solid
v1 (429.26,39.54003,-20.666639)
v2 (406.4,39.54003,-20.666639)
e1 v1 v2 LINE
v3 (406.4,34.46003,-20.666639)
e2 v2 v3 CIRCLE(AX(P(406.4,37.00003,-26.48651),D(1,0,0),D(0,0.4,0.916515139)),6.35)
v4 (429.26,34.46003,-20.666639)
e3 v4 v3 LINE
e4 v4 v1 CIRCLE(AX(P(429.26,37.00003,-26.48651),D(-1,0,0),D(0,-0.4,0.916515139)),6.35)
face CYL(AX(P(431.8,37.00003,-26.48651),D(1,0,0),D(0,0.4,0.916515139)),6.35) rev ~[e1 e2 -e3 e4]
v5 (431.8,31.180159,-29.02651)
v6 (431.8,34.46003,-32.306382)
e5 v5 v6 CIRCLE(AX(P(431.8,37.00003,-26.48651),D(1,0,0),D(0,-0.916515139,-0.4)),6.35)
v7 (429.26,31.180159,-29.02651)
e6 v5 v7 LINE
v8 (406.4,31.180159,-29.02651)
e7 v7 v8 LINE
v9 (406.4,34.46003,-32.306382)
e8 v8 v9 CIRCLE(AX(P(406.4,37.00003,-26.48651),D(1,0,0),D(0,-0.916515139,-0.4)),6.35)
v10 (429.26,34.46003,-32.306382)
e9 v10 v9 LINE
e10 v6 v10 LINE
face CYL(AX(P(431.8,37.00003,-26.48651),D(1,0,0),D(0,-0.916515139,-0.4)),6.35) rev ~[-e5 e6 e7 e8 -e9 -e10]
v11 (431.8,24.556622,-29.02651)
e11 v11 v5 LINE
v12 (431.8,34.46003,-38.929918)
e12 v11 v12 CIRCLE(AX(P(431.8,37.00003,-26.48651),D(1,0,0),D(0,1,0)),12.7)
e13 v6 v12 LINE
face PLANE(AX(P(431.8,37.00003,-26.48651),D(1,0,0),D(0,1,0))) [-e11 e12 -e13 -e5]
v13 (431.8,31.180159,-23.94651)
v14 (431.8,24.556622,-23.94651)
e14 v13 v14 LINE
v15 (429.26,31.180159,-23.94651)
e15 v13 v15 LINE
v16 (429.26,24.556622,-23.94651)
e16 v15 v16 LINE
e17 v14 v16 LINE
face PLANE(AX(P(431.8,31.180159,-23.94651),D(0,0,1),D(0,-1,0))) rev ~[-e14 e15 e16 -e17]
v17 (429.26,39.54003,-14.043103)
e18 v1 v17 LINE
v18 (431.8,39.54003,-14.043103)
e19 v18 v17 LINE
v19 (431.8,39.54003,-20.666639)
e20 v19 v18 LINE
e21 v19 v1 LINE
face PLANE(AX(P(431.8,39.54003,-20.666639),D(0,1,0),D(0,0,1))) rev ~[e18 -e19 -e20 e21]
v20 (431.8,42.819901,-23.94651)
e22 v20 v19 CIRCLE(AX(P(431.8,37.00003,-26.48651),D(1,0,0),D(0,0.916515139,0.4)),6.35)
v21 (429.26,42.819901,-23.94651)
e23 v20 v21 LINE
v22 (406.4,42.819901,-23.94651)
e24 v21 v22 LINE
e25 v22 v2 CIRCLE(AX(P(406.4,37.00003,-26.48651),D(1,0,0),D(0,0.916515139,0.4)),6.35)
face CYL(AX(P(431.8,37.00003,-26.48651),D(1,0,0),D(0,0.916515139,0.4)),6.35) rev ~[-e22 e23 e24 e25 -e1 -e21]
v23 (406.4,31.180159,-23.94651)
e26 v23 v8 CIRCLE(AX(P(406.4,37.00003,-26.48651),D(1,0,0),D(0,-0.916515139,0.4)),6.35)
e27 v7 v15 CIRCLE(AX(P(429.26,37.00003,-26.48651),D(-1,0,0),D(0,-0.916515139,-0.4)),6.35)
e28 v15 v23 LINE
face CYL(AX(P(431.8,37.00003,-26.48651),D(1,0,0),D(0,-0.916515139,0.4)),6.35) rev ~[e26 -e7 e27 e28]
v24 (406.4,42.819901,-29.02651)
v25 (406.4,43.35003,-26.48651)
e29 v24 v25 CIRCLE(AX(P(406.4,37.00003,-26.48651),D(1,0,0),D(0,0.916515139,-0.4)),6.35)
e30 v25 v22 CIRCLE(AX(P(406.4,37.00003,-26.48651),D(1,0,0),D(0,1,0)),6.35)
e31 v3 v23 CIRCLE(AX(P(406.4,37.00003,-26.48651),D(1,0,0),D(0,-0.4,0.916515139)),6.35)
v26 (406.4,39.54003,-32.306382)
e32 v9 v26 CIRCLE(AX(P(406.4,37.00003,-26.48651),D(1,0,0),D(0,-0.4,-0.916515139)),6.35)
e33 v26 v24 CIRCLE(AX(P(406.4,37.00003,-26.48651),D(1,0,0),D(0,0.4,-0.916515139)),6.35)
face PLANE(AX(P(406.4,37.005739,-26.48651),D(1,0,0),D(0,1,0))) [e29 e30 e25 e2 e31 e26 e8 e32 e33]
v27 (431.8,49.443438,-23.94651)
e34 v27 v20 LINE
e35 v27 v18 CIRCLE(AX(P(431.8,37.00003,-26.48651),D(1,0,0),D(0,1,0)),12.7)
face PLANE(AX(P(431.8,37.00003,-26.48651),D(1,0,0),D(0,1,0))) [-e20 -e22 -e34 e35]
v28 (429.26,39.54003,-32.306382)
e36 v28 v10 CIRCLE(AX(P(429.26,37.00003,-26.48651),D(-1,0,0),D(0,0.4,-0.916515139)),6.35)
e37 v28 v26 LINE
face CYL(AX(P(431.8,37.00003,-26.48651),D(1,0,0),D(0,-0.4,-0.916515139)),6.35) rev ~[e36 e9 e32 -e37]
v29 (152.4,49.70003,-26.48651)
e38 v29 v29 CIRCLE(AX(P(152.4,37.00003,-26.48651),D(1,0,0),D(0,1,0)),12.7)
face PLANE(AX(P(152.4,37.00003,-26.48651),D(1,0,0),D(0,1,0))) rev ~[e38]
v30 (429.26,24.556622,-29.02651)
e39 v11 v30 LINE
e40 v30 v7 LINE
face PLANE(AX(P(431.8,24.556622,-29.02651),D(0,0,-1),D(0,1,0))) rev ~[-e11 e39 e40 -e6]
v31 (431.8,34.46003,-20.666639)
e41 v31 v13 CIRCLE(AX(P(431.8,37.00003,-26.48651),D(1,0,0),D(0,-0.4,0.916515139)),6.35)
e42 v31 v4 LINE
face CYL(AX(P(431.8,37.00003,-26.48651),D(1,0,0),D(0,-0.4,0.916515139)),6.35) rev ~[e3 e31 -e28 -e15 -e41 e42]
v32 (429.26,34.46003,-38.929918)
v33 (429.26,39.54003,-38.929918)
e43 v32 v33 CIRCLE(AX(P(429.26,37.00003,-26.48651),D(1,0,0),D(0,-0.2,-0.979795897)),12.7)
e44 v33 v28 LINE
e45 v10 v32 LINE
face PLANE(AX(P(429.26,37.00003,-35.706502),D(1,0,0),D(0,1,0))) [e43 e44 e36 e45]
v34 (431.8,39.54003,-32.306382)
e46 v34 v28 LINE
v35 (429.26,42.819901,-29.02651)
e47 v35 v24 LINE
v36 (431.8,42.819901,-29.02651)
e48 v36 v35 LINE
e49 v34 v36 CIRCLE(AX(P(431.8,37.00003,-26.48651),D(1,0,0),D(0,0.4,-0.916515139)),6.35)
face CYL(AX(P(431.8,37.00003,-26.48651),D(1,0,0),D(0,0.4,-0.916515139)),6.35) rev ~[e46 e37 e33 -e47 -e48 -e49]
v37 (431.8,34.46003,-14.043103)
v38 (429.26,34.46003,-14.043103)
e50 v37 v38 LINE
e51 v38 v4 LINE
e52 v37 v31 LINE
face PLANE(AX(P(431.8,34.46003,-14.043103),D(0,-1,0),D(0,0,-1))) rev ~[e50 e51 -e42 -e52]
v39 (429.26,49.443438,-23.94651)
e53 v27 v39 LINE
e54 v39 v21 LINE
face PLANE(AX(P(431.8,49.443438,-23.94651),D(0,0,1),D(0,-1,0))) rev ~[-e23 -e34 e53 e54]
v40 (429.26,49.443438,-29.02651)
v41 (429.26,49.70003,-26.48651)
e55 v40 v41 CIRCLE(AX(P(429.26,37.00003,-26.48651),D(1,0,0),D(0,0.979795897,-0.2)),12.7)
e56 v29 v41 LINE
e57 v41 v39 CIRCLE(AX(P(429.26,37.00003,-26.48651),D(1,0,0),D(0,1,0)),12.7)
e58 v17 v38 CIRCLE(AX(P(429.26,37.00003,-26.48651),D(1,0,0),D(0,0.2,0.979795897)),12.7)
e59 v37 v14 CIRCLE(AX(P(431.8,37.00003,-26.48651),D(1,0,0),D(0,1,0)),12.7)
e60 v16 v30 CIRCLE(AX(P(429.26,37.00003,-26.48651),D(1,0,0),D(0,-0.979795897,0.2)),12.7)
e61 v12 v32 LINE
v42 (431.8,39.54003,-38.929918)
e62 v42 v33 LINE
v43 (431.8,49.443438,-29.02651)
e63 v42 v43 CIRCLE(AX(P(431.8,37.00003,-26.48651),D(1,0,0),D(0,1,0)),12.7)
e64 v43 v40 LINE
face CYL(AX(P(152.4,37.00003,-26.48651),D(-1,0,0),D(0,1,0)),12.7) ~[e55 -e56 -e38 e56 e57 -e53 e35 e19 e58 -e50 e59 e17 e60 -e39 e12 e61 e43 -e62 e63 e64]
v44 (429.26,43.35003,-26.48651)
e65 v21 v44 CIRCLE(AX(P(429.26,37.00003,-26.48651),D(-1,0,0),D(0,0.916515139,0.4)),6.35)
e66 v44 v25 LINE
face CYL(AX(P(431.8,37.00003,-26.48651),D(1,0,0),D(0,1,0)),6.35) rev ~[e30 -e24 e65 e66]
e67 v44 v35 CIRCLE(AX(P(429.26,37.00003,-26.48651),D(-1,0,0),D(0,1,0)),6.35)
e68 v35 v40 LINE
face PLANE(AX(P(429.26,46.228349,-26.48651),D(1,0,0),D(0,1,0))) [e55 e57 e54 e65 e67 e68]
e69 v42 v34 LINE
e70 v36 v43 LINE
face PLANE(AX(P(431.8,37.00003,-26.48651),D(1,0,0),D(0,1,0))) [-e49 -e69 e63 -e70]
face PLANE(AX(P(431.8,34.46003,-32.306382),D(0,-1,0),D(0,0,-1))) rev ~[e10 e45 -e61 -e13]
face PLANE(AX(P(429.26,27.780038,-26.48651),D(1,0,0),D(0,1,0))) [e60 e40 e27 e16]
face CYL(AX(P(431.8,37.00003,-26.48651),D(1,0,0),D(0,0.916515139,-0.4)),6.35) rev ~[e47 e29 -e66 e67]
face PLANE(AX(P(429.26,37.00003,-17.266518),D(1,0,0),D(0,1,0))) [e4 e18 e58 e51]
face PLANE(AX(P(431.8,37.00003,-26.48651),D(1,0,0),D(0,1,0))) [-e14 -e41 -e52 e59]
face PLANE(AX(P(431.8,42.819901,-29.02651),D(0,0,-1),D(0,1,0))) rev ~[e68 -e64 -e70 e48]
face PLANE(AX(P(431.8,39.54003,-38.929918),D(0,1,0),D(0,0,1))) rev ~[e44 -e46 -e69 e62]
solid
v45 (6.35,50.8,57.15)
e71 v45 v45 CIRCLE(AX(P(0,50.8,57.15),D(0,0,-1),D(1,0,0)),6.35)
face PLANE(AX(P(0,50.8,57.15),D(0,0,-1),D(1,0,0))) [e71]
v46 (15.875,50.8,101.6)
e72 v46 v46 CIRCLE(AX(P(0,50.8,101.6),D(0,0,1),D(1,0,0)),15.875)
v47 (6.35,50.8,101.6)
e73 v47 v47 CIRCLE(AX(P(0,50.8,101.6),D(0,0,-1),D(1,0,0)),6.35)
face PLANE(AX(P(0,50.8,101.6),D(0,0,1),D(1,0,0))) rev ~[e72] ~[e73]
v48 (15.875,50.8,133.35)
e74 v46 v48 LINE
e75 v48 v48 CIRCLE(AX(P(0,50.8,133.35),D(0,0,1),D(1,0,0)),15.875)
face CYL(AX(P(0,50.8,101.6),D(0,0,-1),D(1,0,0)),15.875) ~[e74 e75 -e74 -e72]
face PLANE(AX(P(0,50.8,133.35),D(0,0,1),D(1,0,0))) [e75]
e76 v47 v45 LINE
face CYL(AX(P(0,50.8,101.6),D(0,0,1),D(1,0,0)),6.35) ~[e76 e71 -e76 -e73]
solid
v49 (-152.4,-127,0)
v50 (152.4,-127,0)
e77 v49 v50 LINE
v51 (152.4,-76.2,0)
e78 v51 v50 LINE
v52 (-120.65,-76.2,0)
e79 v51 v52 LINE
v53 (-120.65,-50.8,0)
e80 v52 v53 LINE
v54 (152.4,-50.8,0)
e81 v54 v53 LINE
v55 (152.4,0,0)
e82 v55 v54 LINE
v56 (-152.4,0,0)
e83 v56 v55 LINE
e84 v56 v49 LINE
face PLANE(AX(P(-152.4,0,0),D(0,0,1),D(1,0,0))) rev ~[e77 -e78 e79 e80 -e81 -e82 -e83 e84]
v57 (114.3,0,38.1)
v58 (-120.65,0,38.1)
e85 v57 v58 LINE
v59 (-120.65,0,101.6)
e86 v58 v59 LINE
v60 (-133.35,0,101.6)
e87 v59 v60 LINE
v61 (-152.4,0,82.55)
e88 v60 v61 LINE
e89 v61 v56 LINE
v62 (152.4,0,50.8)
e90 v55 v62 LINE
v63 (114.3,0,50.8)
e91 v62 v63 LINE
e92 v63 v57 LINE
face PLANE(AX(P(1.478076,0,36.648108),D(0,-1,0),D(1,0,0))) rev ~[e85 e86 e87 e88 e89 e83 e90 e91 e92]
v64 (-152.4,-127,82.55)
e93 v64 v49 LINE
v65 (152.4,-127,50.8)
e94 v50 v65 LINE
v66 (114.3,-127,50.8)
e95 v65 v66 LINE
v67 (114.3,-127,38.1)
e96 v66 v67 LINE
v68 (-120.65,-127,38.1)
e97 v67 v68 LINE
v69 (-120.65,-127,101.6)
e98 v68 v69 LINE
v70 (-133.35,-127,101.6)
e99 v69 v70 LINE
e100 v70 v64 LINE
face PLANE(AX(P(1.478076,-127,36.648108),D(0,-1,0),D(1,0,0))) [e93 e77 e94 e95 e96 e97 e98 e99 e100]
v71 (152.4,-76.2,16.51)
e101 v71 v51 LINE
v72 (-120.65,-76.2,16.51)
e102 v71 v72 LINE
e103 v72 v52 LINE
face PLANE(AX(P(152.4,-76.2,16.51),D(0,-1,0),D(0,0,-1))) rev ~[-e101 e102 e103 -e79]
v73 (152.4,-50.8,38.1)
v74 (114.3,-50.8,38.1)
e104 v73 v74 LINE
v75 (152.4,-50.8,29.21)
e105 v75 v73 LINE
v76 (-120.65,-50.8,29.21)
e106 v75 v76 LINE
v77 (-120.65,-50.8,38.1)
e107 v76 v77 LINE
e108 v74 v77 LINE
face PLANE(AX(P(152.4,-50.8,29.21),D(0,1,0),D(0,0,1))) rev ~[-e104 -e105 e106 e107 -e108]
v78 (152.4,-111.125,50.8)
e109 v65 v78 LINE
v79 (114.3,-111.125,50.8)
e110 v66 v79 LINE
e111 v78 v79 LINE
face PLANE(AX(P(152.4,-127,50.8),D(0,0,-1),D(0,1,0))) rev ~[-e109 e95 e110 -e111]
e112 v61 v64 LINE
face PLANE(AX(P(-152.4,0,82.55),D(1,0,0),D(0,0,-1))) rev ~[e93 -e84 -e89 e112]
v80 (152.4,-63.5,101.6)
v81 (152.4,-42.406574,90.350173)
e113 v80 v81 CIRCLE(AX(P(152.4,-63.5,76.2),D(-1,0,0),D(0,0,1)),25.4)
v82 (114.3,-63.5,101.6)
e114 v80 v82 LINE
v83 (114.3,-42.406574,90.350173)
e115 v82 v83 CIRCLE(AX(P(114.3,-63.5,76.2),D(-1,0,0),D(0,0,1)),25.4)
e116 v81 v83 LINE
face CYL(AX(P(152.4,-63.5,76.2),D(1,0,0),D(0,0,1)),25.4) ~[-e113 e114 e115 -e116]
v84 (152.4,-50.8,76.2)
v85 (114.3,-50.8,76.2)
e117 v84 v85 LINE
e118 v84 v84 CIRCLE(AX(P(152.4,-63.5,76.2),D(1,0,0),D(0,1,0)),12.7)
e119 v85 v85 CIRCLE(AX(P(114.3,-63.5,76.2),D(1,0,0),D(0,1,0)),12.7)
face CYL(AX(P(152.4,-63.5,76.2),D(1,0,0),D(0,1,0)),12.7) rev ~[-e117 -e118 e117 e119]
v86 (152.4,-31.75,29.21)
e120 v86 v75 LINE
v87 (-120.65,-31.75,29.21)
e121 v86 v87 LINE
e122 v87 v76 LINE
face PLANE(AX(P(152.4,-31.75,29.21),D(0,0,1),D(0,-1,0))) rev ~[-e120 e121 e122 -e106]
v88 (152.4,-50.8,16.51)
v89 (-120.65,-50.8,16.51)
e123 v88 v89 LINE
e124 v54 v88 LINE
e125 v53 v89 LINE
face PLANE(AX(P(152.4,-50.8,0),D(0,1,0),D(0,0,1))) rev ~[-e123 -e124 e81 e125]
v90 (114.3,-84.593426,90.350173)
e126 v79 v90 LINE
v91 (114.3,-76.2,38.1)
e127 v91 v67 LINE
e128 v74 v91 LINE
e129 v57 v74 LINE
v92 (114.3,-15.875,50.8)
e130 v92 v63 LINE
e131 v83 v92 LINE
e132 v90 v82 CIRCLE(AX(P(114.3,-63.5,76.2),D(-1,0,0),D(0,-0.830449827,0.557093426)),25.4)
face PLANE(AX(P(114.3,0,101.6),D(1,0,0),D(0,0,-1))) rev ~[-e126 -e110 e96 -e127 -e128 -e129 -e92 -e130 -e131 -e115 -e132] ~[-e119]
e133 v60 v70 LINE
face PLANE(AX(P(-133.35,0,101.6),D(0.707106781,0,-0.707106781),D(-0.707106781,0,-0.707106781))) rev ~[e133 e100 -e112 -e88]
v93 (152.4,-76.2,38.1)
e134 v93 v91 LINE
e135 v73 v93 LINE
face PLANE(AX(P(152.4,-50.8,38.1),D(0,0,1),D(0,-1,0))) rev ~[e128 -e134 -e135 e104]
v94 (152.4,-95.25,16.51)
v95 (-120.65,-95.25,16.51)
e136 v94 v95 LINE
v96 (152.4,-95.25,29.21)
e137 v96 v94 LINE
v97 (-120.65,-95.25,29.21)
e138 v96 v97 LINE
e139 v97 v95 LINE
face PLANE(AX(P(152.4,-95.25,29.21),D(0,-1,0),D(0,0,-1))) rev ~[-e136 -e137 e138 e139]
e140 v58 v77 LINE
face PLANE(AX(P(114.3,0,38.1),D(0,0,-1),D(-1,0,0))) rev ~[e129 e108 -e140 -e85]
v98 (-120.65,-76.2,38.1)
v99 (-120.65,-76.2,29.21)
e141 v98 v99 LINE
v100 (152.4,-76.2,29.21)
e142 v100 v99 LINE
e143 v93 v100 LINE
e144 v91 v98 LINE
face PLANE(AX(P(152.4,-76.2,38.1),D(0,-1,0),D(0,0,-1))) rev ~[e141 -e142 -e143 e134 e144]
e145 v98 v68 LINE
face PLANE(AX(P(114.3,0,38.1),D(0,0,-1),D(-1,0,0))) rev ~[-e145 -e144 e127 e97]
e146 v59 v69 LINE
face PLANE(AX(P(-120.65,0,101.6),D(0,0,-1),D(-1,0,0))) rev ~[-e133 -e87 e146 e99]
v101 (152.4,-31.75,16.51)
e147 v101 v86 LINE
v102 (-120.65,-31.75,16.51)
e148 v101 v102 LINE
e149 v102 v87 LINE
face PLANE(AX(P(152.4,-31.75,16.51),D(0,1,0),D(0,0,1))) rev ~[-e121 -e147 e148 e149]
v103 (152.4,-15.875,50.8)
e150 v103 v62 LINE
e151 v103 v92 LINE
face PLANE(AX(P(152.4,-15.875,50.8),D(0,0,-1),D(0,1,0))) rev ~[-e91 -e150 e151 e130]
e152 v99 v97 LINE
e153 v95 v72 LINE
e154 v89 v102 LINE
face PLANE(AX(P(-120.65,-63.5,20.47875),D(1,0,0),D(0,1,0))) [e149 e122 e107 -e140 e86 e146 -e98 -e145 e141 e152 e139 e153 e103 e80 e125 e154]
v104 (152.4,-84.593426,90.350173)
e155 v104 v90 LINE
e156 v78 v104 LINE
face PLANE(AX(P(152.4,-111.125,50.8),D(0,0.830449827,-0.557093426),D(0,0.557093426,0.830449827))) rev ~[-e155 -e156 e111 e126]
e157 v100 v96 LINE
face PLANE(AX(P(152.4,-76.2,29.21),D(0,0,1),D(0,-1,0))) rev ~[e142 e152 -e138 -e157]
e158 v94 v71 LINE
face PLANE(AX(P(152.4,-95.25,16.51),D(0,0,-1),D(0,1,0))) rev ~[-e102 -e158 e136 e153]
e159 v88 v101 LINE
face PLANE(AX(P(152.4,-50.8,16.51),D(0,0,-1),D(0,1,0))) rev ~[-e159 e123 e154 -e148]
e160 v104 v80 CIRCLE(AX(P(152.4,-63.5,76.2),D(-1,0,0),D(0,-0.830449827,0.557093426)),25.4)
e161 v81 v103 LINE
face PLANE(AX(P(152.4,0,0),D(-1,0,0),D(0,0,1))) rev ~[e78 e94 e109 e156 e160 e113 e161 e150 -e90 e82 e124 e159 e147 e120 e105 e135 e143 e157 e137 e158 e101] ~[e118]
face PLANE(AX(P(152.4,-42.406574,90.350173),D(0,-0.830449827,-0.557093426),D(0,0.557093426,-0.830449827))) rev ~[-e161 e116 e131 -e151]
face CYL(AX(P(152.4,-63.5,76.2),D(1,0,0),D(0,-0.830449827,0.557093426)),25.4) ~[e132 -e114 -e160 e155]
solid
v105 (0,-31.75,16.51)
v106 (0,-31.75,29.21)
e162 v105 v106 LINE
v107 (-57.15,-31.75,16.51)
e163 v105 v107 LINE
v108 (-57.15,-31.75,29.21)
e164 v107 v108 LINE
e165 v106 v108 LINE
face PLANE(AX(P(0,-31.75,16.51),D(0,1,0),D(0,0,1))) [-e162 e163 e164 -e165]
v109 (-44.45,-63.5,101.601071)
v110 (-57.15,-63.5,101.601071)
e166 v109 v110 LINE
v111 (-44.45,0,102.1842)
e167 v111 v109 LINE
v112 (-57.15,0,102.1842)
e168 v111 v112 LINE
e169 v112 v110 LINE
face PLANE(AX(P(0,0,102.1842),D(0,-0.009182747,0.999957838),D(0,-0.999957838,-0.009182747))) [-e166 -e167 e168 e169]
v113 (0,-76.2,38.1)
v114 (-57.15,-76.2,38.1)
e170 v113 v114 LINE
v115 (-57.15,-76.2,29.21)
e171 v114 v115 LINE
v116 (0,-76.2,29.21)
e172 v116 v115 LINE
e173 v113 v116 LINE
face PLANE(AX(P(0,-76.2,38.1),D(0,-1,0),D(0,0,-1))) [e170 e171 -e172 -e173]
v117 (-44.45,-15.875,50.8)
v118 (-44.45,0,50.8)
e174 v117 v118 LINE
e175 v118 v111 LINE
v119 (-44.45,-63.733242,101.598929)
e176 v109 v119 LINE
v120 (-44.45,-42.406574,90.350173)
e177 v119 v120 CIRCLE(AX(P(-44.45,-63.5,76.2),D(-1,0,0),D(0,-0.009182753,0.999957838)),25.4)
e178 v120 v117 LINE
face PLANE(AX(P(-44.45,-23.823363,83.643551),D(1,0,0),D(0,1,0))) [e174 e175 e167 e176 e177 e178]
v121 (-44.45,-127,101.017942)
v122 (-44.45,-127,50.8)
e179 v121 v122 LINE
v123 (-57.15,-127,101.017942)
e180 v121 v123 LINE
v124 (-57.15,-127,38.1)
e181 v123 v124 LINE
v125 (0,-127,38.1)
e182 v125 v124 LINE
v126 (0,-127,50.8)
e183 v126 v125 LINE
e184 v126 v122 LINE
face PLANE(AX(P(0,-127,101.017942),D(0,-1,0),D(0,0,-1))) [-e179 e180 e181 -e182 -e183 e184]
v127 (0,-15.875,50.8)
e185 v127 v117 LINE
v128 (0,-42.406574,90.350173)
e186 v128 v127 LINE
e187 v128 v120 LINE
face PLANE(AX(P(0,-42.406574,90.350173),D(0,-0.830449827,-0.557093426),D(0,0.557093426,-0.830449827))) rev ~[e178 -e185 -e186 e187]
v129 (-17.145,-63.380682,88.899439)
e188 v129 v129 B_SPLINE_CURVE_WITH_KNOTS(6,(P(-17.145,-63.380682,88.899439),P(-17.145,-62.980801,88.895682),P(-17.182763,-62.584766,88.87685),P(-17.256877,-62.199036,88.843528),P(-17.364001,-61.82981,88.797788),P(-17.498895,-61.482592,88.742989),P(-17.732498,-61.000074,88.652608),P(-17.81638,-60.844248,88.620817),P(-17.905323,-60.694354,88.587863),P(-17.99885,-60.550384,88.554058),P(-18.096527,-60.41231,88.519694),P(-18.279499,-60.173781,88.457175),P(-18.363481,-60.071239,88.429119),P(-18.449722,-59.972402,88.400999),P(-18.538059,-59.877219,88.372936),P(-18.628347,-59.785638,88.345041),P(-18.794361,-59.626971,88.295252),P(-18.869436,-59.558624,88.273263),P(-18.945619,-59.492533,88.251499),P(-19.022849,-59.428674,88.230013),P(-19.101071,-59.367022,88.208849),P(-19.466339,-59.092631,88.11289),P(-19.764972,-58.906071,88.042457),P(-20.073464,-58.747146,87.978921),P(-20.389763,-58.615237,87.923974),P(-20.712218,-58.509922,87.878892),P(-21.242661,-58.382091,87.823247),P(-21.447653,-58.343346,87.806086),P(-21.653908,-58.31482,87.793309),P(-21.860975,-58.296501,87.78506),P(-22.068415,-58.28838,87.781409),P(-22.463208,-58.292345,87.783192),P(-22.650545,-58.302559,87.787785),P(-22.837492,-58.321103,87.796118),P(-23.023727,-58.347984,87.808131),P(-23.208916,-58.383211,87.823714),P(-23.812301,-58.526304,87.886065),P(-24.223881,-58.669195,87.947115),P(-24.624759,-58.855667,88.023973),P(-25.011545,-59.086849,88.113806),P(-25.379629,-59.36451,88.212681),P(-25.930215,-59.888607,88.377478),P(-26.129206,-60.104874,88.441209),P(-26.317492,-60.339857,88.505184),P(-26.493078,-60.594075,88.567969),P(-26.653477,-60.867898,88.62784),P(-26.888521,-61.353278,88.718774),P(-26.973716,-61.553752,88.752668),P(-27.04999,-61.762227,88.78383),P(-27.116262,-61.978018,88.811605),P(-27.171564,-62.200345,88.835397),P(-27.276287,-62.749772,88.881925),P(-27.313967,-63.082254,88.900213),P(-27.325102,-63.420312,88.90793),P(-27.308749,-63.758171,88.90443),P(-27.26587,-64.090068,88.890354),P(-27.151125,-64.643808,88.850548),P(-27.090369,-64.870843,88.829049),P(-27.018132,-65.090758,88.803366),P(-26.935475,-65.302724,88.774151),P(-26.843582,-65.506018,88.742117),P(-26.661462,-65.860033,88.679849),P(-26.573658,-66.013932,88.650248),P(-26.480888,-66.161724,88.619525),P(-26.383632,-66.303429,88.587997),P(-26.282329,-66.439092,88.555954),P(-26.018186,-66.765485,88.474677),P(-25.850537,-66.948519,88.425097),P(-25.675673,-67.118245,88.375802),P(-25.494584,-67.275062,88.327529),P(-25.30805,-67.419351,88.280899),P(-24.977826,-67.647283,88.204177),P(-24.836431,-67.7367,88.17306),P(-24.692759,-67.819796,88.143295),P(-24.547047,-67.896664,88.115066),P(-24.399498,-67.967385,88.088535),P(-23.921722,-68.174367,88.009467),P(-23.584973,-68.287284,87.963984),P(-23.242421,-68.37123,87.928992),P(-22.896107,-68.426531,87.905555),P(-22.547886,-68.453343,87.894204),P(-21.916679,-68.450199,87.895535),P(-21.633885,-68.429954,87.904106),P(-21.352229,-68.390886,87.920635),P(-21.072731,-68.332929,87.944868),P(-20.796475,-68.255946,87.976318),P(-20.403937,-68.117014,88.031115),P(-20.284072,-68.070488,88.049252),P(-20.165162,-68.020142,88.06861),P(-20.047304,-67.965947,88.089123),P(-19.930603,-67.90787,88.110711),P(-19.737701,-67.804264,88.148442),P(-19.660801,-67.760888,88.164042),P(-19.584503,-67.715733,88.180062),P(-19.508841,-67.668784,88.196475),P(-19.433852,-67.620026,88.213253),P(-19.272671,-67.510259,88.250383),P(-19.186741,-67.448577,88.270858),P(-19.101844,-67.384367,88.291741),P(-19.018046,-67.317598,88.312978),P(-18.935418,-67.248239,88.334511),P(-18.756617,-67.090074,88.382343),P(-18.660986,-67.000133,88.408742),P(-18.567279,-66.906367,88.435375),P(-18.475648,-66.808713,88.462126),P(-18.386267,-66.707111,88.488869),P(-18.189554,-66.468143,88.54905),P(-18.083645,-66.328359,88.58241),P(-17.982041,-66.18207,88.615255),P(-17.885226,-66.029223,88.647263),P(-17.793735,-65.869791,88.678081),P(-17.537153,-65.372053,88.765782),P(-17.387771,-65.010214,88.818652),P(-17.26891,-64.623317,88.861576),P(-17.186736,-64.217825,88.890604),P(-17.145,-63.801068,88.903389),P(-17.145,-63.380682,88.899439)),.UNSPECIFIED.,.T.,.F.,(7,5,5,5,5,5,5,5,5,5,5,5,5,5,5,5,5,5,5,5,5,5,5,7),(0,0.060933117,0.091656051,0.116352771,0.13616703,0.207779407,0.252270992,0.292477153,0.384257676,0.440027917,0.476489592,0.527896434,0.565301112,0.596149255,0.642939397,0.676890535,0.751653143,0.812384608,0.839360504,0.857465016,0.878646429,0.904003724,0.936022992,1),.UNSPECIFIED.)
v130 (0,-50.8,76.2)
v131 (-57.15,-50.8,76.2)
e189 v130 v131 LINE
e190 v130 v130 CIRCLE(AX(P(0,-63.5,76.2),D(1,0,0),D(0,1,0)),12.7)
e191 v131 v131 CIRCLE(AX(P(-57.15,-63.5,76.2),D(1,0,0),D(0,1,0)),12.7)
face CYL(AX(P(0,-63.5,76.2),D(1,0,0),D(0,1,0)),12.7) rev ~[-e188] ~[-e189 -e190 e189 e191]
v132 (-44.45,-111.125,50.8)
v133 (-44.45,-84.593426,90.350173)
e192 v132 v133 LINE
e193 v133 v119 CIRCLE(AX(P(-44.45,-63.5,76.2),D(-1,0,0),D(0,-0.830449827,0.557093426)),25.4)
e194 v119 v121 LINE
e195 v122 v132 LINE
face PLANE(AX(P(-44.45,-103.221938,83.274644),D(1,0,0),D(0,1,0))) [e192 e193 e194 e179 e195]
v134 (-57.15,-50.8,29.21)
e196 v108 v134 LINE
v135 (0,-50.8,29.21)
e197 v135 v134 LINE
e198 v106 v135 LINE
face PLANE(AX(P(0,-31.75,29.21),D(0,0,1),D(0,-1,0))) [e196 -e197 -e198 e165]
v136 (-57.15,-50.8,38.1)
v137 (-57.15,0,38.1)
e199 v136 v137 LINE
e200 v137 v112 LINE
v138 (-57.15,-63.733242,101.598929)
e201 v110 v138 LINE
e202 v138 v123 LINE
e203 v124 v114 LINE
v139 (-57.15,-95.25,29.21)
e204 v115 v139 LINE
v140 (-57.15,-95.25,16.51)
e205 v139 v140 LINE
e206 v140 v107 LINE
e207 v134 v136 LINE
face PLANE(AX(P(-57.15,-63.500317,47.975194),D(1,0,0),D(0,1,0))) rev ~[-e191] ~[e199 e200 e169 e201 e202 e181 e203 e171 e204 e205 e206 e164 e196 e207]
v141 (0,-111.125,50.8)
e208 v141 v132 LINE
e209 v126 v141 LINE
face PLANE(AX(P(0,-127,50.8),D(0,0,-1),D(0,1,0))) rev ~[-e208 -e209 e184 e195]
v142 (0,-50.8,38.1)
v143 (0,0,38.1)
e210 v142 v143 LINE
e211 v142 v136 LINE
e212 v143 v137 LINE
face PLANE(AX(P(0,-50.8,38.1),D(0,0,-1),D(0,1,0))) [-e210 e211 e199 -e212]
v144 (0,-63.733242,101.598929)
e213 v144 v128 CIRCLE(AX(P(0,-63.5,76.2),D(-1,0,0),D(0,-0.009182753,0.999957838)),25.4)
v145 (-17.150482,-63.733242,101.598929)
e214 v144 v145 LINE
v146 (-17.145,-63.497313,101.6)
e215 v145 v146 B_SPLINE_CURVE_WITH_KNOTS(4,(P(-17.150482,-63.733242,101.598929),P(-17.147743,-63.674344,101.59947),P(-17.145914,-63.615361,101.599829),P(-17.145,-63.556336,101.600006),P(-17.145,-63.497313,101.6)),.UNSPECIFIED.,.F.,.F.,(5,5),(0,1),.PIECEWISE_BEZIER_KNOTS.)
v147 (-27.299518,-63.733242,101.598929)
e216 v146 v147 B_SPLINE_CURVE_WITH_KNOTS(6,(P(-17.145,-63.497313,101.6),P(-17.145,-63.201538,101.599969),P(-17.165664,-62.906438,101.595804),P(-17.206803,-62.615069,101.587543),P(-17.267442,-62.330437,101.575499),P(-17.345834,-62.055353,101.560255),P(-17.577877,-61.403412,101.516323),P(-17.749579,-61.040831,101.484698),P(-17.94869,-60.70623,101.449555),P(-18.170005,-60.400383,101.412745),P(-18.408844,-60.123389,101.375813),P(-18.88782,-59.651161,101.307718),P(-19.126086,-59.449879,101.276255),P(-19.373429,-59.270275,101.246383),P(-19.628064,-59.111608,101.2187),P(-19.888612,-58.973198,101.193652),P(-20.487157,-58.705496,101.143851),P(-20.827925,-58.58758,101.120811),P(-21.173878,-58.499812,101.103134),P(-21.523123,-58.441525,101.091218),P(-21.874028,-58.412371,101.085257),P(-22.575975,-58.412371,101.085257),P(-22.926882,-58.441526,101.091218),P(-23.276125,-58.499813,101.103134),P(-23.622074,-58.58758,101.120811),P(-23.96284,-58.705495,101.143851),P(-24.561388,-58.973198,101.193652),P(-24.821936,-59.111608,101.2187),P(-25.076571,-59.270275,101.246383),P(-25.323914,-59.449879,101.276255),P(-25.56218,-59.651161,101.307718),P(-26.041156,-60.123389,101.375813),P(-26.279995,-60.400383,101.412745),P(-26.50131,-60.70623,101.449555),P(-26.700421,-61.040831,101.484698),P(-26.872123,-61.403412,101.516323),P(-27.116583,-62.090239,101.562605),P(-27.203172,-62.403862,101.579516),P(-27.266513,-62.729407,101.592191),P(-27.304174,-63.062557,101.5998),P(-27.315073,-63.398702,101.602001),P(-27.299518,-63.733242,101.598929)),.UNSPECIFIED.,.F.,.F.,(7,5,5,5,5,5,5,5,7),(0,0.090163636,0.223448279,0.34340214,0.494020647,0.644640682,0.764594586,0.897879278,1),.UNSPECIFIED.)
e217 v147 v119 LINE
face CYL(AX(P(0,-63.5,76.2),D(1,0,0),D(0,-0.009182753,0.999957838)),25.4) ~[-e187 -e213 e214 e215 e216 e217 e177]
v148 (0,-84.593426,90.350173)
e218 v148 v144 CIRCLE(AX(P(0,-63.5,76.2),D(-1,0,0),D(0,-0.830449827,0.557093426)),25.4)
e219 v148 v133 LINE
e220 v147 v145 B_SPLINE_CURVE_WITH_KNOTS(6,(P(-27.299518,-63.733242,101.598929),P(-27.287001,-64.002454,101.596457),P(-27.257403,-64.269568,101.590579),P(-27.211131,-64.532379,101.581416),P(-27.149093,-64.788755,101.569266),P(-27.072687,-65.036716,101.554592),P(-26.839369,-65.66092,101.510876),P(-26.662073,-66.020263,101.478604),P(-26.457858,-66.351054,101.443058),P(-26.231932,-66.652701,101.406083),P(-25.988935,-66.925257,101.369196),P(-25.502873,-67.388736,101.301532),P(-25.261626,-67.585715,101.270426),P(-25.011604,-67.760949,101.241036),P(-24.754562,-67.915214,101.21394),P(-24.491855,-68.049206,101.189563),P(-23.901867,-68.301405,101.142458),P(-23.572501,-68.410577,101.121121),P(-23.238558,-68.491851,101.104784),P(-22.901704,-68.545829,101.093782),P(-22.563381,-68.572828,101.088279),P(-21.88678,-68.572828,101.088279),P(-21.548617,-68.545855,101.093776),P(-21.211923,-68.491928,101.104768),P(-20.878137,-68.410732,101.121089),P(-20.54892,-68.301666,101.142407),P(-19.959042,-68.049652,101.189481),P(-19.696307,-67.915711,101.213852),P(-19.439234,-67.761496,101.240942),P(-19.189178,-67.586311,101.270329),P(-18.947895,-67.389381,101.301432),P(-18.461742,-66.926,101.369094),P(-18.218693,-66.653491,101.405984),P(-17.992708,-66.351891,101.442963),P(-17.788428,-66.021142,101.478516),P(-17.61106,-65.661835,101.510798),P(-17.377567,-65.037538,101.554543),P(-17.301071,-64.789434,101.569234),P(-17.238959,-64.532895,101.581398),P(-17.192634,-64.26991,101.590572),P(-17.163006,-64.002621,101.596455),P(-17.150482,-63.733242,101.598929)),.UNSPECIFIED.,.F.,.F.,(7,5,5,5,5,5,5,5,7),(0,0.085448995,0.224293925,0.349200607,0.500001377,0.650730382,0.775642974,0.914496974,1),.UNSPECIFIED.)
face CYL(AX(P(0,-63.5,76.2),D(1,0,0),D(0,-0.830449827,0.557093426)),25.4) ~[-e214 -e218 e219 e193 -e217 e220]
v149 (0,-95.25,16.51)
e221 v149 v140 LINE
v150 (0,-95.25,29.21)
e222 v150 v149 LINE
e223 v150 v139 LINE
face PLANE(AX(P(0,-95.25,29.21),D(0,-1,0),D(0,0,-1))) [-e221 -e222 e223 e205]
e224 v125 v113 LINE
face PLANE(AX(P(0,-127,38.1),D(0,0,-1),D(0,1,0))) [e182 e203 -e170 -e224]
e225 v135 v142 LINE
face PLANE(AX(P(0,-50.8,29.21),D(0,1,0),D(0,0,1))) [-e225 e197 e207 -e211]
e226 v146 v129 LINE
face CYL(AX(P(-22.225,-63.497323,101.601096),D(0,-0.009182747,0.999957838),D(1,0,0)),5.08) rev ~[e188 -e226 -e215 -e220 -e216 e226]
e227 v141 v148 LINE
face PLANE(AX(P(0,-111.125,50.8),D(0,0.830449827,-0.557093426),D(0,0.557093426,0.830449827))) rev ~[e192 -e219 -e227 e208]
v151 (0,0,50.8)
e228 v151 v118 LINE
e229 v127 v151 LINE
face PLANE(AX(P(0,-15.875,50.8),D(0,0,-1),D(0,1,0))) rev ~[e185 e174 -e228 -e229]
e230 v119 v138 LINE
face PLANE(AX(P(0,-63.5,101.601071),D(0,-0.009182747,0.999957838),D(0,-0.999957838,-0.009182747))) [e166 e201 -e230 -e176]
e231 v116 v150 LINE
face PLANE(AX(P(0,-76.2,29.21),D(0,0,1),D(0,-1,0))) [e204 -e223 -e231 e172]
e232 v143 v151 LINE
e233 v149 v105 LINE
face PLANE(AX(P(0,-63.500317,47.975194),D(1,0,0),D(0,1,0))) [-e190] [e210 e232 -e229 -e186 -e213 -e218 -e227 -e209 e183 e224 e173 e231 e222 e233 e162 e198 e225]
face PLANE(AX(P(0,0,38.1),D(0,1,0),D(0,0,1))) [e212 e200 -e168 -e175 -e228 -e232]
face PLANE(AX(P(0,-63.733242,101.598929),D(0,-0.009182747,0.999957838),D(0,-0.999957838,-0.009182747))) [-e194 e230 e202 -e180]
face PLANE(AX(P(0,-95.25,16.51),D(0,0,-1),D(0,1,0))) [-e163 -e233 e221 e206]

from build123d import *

# Parameters (mm, degrees)
F1_DEPTH  = 127
F3_DEPTH  = 273.05
F2_R      = 12.7
F4_DEPTH  = 38.1
F5_R      = 12.7
F6_DEPTH  = 57.15
F7_DEPTH  = 44.45
F8_R      = 5.08
F9_DEPTH  = 25.4
F10_R     = 12.7
F11_DEPTH = 279.4
F13_DEPTH = 25.4
F14_DEPTH = 2.54
F15_R     = 15.875
F16_DEPTH = 31.75
F17_R     = 6.35
F18_DEPTH = 44.45


with BuildPart() as f1:
    # F0 (on Front) → F1 (new body)
    with BuildSketch(Plane.XZ):
        Polygon((-152.4, 82.55), (-152.4, 0), (152.4, 0), (152.4, 101.6), (114.3, 101.6), (114.3, 38.1), (-120.65, 38.1), (-120.65, 101.6), (-133.35, 101.6), align=None)
    extrude(amount=F1_DEPTH)

    # F2 (on face) → F3 (cut, through all)
    with BuildSketch(Plane.YZ.offset(152.4)):
        Polygon((-76.2, 16.51), (-76.2, 0), (-50.8, 0), (-50.8, 16.51), (-31.75, 16.51), (-31.75, 29.21), (-50.8, 29.21), (-50.8, 38.1), (-76.2, 38.1), (-76.2, 29.21), (-95.25, 29.21), (-95.25, 16.51), align=None)
    extrude(amount=-F3_DEPTH, mode=Mode.SUBTRACT)

    # F2 (on face) → F4 (cut, through all)
    with BuildSketch(Plane.YZ.offset(152.4)):
        with BuildLine():
            Line((-127, 101.6), (-127, 50.8))
            Line((-127, 50.8), (-111.125, 50.8))
            Line((-111.125, 50.8), (-84.5934256055, 90.3501730104))
            ThreePointArc((-84.5934256055, 90.3501730104), (-75.4529411765, 98.6117647059), (-63.5, 101.6))
            Line((-63.5, 101.6), (-127, 101.6))
        make_face()
        with BuildLine():
            Line((0, 101.6), (-63.5, 101.6))
            ThreePointArc((-63.5, 101.6), (-51.5470588235, 98.6117647059), (-42.4065743945, 90.3501730104))
            Line((-42.4065743945, 90.3501730104), (-15.875, 50.8))
            Line((-15.875, 50.8), (0, 50.8))
            Line((0, 50.8), (0, 101.6))
        make_face()
        with Locations((-63.5, 76.2)):
            Circle(F2_R)
    extrude(amount=-F4_DEPTH, mode=Mode.SUBTRACT)


with BuildPart() as f6:
    # F5 (on Right) → F6 (new body)
    with BuildSketch(Plane.YZ):
        with BuildLine():
            Line((-95.25, 29.21), (-95.25, 16.51))
            Line((-95.25, 16.51), (-31.75, 16.51))
            Line((-31.75, 16.51), (-31.75, 29.21))
            Line((-31.75, 29.21), (-50.8, 29.21))
            Line((-50.8, 29.21), (-50.8, 38.1))
            Line((-50.8, 38.1), (0, 38.1))
            Line((0, 38.1), (0, 50.8))
            Line((0, 50.8), (-15.875, 50.8))
            Line((-15.875, 50.8), (-42.4065743945, 90.3501730104))
            ThreePointArc((-42.4065743945, 90.3501730104), (-51.6500867545, 98.6664095056), (-63.7332419371, 101.5989290758))
            ThreePointArc((-63.7332419371, 101.5989290758), (-75.555717124, 98.5566474371), (-84.5934256055, 90.3501730104))
            Line((-84.5934256055, 90.3501730104), (-111.125, 50.8))
            Line((-111.125, 50.8), (-127, 50.8))
            Line((-127, 50.8), (-127, 38.1))
            Line((-127, 38.1), (-76.2, 38.1))
            Line((-76.2, 38.1), (-76.2, 29.21))
            Line((-76.2, 29.21), (-95.25, 29.21))
        make_face()
        with Locations((-63.5, 76.2)):
            Circle(F5_R, mode=Mode.SUBTRACT)
        with BuildLine():
            Line((-127, 101.0179419357), (-127, 50.8))
            Line((-127, 50.8), (-111.125, 50.8))
            Line((-111.125, 50.8), (-84.5934256055, 90.3501730104))
            ThreePointArc((-84.5934256055, 90.3501730104), (-75.555717124, 98.5566474371), (-63.7332419371, 101.5989290758))
            Line((-63.7332419371, 101.5989290758), (-127, 101.0179419357))
        make_face()
        with BuildLine():
            Line((-15.875, 50.8), (0, 50.8))
            Line((0, 50.8), (0, 102.1842))
            Line((0, 102.1842), (-63.5, 101.6010709679))
            Line((-63.5, 101.6010709679), (-63.7332419371, 101.5989290758))
            ThreePointArc((-63.7332419371, 101.5989290758), (-51.6500867545, 98.6664095056), (-42.4065743945, 90.3501730104))
            Line((-42.4065743945, 90.3501730104), (-15.875, 50.8))
        make_face()
    extrude(amount=-F6_DEPTH)

    # F5 (on Right) → F7 (cut)
    with BuildSketch(Plane.YZ):
        with BuildLine():
            Line((-127, 101.0179419357), (-127, 50.8))
            Line((-127, 50.8), (-111.125, 50.8))
            Line((-111.125, 50.8), (-84.5934256055, 90.3501730104))
            ThreePointArc((-84.5934256055, 90.3501730104), (-75.555717124, 98.5566474371), (-63.7332419371, 101.5989290758))
            Line((-63.7332419371, 101.5989290758), (-127, 101.0179419357))
        make_face()
        with BuildLine():
            Line((-15.875, 50.8), (0, 50.8))
            Line((0, 50.8), (0, 102.1842))
            Line((0, 102.1842), (-63.5, 101.6010709679))
            Line((-63.5, 101.6010709679), (-63.7332419371, 101.5989290758))
            ThreePointArc((-63.7332419371, 101.5989290758), (-51.6500867545, 98.6664095056), (-42.4065743945, 90.3501730104))
            Line((-42.4065743945, 90.3501730104), (-15.875, 50.8))
        make_face()
    extrude(amount=-F7_DEPTH, mode=Mode.SUBTRACT)

    # F8 (on face) → F9 (cut)
    with BuildSketch(Plane(origin=(0, -0.9382921124, 102.1755835375), x_dir=(1, 0, 0), z_dir=(0, -0.0091827472, 0.9999578377))):
        with Locations((-22.225, -62.5616683254)):
            Circle(F8_R)
    extrude(amount=-F9_DEPTH, mode=Mode.SUBTRACT)


with BuildPart() as f11:
    # F10 (on face) → F11 (new body)
    with BuildSketch(Plane.YZ.offset(152.4)):
        with Locations((37.0000302792, -26.4865104109)):
            Circle(F10_R)
    extrude(amount=F11_DEPTH)

    # F12 (on face) → F13 (cut)
    with BuildSketch(Plane.YZ.offset(431.8)):
        with BuildLine():
            ThreePointArc((42.8199014118, -29.0265104109), (43.2160853663, -27.7838766483), (43.3500302792, -26.4865104109))
            ThreePointArc((43.3500302792, -26.4865104109), (43.2160853663, -25.1891441735), (42.8199014118, -23.9465104109))
            ThreePointArc((42.8199014118, -23.9465104109), (41.4901583397, -21.9963823504), (39.5400302792, -20.6666392783))
            ThreePointArc((39.5400302792, -20.6666392783), (37.0000302792, -20.1365104109), (34.4600302792, -20.6666392783))
            ThreePointArc((34.4600302792, -20.6666392783), (32.5099022186, -21.9963823504), (31.1801591466, -23.9465104109))
            ThreePointArc((31.1801591466, -23.9465104109), (30.6500302792, -26.4865104109), (31.1801591466, -29.0265104109))
            ThreePointArc((31.1801591466, -29.0265104109), (32.5099022186, -30.9766384714), (34.4600302792, -32.3063815435))
            ThreePointArc((34.4600302792, -32.3063815435), (37.0000302792, -32.8365104109), (39.5400302792, -32.3063815435))
            ThreePointArc((39.5400302792, -32.3063815435), (41.4901583397, -30.9766384714), (42.8199014118, -29.0265104109))
        make_face()
    extrude(amount=-F13_DEPTH, mode=Mode.SUBTRACT)

    # F12 (on face) → F14 (cut)
    with BuildSketch(Plane.YZ.offset(431.8)):
        with BuildLine():
            ThreePointArc((31.1801591466, -29.0265104109), (30.6500302792, -26.4865104109), (31.1801591466, -23.9465104109))
            Line((31.1801591466, -23.9465104109), (24.5566223858, -23.9465104109))
            ThreePointArc((24.5566223858, -23.9465104109), (24.3000302792, -26.4865104109), (24.5566223858, -29.0265104109))
            Line((24.5566223858, -29.0265104109), (31.1801591466, -29.0265104109))
        make_face()
        with BuildLine():
            ThreePointArc((34.4600302792, -20.6666392783), (37.0000302792, -20.1365104109), (39.5400302792, -20.6666392783))
            Line((39.5400302792, -20.6666392783), (39.5400302792, -14.0431025176))
            ThreePointArc((39.5400302792, -14.0431025176), (37.0000302792, -13.7865104109), (34.4600302792, -14.0431025176))
            Line((34.4600302792, -14.0431025176), (34.4600302792, -20.6666392783))
        make_face()
        with BuildLine():
            ThreePointArc((42.8199014118, -23.9465104109), (43.2160853663, -25.1891441735), (43.3500302792, -26.4865104109))
            ThreePointArc((43.3500302792, -26.4865104109), (43.2160853663, -27.7838766483), (42.8199014118, -29.0265104109))
            Line((42.8199014118, -29.0265104109), (49.4434381725, -29.0265104109))
            ThreePointArc((49.4434381725, -29.0265104109), (49.6357194223, -27.7629742284), (49.7000302792, -26.4865104109))
            ThreePointArc((49.7000302792, -26.4865104109), (49.6357194223, -25.2100465934), (49.4434381725, -23.9465104109))
            Line((49.4434381725, -23.9465104109), (42.8199014118, -23.9465104109))
        make_face()
        with BuildLine():
            Line((39.5400302792, -38.9299183042), (39.5400302792, -32.3063815435))
            ThreePointArc((39.5400302792, -32.3063815435), (37.0000302792, -32.8365104109), (34.4600302792, -32.3063815435))
            Line((34.4600302792, -32.3063815435), (34.4600302792, -38.9299183042))
            ThreePointArc((34.4600302792, -38.9299183042), (37.0000302792, -39.1865104109), (39.5400302792, -38.9299183042))
        make_face()
    extrude(amount=-F14_DEPTH, mode=Mode.SUBTRACT)


with BuildPart() as f16:
    # F15 (on face) → F16 (new body)
    with BuildSketch(Plane.XY.offset(101.6)):
        with Locations((0, 50.8)):
            Circle(F15_R)
    extrude(amount=F16_DEPTH)

    # F17 (on face) → F18 (join)
    with BuildSketch(Plane(origin=(0, 0, 101.6), x_dir=(1, 0, 0), z_dir=(0, 0, -1))):
        with Locations((0, -50.8)):
            Circle(F17_R)
    extrude(amount=F18_DEPTH)


solid = Compound([f1.part, f6.part, f11.part, f16.part])
